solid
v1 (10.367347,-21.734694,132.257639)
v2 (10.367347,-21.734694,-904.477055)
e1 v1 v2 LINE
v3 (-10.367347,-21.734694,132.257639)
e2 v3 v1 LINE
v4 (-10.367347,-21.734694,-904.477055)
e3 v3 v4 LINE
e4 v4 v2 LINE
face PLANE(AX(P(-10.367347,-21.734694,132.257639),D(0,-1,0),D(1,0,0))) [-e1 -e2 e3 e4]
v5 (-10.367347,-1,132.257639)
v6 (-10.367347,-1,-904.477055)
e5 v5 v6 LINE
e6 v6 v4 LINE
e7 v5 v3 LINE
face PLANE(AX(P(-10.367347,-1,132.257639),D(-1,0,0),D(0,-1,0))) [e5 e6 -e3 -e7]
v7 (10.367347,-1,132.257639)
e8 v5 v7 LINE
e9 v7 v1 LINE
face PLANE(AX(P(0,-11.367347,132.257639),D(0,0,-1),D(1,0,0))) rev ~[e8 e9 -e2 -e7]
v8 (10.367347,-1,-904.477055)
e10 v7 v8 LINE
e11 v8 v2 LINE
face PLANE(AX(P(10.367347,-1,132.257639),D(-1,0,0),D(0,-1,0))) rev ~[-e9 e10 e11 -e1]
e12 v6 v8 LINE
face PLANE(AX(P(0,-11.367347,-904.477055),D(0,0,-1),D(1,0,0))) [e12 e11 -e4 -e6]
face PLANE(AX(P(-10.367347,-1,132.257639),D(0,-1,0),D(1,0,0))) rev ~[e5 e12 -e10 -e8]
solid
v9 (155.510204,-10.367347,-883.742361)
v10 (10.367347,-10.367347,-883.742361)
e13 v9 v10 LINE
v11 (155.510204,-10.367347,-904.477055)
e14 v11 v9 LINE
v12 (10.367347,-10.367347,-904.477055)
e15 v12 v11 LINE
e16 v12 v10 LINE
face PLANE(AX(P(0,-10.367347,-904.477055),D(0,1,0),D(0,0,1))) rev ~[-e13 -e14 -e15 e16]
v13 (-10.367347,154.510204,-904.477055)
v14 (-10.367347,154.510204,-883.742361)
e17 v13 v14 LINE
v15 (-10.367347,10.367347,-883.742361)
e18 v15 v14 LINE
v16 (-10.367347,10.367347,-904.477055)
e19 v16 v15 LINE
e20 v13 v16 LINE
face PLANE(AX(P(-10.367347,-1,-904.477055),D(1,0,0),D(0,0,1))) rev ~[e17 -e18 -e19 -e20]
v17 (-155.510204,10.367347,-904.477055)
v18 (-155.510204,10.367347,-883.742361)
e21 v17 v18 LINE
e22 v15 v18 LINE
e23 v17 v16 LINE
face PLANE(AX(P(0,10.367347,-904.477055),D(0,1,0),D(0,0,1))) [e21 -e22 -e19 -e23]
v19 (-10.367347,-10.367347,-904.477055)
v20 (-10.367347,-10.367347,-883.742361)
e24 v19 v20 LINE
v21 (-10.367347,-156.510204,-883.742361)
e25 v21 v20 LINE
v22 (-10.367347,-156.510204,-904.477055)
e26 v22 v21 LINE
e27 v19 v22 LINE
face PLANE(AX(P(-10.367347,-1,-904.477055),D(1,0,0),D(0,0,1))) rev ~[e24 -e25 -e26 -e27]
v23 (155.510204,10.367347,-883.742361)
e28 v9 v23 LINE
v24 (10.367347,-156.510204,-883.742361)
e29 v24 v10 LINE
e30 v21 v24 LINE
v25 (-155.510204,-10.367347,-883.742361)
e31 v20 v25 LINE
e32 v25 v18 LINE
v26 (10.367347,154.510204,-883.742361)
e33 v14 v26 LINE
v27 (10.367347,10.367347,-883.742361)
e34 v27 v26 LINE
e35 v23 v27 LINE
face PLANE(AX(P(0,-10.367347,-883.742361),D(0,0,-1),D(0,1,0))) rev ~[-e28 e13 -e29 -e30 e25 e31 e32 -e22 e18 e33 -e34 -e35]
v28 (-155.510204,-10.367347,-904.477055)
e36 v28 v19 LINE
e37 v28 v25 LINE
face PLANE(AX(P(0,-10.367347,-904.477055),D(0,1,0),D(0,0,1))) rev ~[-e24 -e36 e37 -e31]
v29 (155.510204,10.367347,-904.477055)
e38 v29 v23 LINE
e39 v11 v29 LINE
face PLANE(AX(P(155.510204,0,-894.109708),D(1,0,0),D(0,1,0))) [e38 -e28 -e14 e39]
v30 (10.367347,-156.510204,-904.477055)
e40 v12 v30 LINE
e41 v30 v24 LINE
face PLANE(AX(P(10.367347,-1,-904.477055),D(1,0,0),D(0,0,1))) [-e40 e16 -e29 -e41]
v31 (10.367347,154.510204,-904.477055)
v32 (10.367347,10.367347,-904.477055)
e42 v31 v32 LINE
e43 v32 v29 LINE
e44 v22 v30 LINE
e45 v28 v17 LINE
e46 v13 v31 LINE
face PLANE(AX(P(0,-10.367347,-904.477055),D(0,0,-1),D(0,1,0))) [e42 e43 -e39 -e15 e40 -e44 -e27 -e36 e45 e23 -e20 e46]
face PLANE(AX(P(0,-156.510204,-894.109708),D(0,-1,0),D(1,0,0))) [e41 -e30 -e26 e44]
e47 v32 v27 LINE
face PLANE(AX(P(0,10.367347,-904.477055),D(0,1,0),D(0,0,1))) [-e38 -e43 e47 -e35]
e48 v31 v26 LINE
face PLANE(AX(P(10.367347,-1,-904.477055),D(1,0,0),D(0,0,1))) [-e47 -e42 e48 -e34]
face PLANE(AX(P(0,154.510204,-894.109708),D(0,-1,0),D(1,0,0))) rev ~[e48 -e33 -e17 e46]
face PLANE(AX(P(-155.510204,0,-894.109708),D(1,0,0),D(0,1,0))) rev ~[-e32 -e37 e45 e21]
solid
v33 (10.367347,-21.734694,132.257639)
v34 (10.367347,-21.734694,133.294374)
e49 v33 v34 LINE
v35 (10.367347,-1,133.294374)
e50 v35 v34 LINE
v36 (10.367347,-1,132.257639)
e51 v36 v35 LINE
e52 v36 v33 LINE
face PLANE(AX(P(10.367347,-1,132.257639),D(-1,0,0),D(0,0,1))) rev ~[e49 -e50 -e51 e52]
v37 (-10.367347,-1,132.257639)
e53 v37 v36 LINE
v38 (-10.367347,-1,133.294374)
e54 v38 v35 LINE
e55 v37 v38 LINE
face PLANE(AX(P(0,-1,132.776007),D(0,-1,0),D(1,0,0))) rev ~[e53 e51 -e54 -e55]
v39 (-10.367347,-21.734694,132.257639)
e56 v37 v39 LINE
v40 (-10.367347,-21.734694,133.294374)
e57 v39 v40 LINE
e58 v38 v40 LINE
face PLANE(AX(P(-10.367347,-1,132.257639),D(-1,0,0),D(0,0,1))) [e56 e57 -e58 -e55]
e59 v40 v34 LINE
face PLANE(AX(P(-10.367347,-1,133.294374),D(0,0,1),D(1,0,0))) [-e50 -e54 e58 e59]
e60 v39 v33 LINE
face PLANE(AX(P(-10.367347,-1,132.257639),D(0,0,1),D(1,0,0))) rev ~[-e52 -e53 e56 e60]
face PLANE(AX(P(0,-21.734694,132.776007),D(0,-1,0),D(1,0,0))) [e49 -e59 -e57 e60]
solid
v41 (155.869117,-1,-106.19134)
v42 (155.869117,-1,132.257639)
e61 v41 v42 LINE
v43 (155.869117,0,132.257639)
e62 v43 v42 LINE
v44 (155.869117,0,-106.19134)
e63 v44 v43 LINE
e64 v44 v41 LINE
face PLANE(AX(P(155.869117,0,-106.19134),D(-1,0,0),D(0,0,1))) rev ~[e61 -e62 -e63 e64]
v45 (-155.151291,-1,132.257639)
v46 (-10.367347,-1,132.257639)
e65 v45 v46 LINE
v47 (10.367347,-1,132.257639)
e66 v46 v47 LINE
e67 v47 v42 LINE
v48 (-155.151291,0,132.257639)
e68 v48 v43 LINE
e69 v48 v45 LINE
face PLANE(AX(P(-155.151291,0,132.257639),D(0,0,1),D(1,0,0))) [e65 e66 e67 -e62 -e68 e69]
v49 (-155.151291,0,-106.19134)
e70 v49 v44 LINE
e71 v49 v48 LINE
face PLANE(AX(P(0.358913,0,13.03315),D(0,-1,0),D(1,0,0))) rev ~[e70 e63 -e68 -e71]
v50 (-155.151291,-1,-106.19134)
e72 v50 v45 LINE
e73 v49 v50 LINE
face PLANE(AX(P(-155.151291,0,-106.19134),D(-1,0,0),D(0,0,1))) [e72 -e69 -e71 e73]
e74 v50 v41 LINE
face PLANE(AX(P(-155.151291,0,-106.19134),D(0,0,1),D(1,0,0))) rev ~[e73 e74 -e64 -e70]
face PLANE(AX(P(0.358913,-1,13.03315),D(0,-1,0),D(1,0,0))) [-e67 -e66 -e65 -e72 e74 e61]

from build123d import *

# Parameters (mm, degrees)
F0_W     = 311.0204081633
F0_H     = 238.4489795918
F1_DEPTH = 1
F2_W     = 20.7346938776
F2_H     = 1.0367346939
F3_DEPTH = 20.7346938776
F5_W     = 20.7346938776
F5_H     = 20.7346938776
F6_DEPTH = 155.5102040816
F7_W     = 20.7346938776
F7_H     = 20.7346938776
F8_DEPTH = 155.5102040816
F4_W     = 20.7346938776
F4_H     = 20.7346938776
F9_DEPTH = 1036.7346938776


# Not quite as in the source:
# - the program builds the solid bodies; features that only make, move or delete a surface that nothing else refers to are left out


with BuildPart() as f1:
    # F0 (on Front) → F1 (new body)
    with BuildSketch(Plane.XZ):
        with Locations((0.3589130938, 13.0331495404)):
            Rectangle(F0_W, F0_H)
    extrude(amount=F1_DEPTH)

    # F2 (on face) → F3 (join)
    with BuildSketch(Plane.XZ.offset(1)):
        with Locations((0, 132.7760066833)):
            Rectangle(F2_W, F2_H)
    extrude(amount=F3_DEPTH)


with BuildPart() as f6:
    # F5 (on face) → F6 (new body, symmetric)
    with BuildSketch(Plane.XZ.offset(1)):
        with Locations((0, -894.1097076024)):
            Rectangle(F5_W, F5_H)
    extrude(amount=F6_DEPTH, both=True)

    # F7 (on Right) → F8 (join, symmetric)
    with BuildSketch(Plane.YZ):
        with Locations((0, -894.1097076024)):
            Rectangle(F7_W, F7_H)
    extrude(amount=F8_DEPTH, both=True)


with BuildPart() as f9:
    # F4 (on face) → F9 (new body)
    with BuildSketch(Plane(origin=(0, 0, 132.2576393363), x_dir=(1, 0, 0), z_dir=(0, 0, -1))):
        with Locations((0, 11.3673469388)):
            Rectangle(F4_W, F4_H)
    extrude(amount=F9_DEPTH)


solid = Compound([f1.part, f6.part, f9.part])
